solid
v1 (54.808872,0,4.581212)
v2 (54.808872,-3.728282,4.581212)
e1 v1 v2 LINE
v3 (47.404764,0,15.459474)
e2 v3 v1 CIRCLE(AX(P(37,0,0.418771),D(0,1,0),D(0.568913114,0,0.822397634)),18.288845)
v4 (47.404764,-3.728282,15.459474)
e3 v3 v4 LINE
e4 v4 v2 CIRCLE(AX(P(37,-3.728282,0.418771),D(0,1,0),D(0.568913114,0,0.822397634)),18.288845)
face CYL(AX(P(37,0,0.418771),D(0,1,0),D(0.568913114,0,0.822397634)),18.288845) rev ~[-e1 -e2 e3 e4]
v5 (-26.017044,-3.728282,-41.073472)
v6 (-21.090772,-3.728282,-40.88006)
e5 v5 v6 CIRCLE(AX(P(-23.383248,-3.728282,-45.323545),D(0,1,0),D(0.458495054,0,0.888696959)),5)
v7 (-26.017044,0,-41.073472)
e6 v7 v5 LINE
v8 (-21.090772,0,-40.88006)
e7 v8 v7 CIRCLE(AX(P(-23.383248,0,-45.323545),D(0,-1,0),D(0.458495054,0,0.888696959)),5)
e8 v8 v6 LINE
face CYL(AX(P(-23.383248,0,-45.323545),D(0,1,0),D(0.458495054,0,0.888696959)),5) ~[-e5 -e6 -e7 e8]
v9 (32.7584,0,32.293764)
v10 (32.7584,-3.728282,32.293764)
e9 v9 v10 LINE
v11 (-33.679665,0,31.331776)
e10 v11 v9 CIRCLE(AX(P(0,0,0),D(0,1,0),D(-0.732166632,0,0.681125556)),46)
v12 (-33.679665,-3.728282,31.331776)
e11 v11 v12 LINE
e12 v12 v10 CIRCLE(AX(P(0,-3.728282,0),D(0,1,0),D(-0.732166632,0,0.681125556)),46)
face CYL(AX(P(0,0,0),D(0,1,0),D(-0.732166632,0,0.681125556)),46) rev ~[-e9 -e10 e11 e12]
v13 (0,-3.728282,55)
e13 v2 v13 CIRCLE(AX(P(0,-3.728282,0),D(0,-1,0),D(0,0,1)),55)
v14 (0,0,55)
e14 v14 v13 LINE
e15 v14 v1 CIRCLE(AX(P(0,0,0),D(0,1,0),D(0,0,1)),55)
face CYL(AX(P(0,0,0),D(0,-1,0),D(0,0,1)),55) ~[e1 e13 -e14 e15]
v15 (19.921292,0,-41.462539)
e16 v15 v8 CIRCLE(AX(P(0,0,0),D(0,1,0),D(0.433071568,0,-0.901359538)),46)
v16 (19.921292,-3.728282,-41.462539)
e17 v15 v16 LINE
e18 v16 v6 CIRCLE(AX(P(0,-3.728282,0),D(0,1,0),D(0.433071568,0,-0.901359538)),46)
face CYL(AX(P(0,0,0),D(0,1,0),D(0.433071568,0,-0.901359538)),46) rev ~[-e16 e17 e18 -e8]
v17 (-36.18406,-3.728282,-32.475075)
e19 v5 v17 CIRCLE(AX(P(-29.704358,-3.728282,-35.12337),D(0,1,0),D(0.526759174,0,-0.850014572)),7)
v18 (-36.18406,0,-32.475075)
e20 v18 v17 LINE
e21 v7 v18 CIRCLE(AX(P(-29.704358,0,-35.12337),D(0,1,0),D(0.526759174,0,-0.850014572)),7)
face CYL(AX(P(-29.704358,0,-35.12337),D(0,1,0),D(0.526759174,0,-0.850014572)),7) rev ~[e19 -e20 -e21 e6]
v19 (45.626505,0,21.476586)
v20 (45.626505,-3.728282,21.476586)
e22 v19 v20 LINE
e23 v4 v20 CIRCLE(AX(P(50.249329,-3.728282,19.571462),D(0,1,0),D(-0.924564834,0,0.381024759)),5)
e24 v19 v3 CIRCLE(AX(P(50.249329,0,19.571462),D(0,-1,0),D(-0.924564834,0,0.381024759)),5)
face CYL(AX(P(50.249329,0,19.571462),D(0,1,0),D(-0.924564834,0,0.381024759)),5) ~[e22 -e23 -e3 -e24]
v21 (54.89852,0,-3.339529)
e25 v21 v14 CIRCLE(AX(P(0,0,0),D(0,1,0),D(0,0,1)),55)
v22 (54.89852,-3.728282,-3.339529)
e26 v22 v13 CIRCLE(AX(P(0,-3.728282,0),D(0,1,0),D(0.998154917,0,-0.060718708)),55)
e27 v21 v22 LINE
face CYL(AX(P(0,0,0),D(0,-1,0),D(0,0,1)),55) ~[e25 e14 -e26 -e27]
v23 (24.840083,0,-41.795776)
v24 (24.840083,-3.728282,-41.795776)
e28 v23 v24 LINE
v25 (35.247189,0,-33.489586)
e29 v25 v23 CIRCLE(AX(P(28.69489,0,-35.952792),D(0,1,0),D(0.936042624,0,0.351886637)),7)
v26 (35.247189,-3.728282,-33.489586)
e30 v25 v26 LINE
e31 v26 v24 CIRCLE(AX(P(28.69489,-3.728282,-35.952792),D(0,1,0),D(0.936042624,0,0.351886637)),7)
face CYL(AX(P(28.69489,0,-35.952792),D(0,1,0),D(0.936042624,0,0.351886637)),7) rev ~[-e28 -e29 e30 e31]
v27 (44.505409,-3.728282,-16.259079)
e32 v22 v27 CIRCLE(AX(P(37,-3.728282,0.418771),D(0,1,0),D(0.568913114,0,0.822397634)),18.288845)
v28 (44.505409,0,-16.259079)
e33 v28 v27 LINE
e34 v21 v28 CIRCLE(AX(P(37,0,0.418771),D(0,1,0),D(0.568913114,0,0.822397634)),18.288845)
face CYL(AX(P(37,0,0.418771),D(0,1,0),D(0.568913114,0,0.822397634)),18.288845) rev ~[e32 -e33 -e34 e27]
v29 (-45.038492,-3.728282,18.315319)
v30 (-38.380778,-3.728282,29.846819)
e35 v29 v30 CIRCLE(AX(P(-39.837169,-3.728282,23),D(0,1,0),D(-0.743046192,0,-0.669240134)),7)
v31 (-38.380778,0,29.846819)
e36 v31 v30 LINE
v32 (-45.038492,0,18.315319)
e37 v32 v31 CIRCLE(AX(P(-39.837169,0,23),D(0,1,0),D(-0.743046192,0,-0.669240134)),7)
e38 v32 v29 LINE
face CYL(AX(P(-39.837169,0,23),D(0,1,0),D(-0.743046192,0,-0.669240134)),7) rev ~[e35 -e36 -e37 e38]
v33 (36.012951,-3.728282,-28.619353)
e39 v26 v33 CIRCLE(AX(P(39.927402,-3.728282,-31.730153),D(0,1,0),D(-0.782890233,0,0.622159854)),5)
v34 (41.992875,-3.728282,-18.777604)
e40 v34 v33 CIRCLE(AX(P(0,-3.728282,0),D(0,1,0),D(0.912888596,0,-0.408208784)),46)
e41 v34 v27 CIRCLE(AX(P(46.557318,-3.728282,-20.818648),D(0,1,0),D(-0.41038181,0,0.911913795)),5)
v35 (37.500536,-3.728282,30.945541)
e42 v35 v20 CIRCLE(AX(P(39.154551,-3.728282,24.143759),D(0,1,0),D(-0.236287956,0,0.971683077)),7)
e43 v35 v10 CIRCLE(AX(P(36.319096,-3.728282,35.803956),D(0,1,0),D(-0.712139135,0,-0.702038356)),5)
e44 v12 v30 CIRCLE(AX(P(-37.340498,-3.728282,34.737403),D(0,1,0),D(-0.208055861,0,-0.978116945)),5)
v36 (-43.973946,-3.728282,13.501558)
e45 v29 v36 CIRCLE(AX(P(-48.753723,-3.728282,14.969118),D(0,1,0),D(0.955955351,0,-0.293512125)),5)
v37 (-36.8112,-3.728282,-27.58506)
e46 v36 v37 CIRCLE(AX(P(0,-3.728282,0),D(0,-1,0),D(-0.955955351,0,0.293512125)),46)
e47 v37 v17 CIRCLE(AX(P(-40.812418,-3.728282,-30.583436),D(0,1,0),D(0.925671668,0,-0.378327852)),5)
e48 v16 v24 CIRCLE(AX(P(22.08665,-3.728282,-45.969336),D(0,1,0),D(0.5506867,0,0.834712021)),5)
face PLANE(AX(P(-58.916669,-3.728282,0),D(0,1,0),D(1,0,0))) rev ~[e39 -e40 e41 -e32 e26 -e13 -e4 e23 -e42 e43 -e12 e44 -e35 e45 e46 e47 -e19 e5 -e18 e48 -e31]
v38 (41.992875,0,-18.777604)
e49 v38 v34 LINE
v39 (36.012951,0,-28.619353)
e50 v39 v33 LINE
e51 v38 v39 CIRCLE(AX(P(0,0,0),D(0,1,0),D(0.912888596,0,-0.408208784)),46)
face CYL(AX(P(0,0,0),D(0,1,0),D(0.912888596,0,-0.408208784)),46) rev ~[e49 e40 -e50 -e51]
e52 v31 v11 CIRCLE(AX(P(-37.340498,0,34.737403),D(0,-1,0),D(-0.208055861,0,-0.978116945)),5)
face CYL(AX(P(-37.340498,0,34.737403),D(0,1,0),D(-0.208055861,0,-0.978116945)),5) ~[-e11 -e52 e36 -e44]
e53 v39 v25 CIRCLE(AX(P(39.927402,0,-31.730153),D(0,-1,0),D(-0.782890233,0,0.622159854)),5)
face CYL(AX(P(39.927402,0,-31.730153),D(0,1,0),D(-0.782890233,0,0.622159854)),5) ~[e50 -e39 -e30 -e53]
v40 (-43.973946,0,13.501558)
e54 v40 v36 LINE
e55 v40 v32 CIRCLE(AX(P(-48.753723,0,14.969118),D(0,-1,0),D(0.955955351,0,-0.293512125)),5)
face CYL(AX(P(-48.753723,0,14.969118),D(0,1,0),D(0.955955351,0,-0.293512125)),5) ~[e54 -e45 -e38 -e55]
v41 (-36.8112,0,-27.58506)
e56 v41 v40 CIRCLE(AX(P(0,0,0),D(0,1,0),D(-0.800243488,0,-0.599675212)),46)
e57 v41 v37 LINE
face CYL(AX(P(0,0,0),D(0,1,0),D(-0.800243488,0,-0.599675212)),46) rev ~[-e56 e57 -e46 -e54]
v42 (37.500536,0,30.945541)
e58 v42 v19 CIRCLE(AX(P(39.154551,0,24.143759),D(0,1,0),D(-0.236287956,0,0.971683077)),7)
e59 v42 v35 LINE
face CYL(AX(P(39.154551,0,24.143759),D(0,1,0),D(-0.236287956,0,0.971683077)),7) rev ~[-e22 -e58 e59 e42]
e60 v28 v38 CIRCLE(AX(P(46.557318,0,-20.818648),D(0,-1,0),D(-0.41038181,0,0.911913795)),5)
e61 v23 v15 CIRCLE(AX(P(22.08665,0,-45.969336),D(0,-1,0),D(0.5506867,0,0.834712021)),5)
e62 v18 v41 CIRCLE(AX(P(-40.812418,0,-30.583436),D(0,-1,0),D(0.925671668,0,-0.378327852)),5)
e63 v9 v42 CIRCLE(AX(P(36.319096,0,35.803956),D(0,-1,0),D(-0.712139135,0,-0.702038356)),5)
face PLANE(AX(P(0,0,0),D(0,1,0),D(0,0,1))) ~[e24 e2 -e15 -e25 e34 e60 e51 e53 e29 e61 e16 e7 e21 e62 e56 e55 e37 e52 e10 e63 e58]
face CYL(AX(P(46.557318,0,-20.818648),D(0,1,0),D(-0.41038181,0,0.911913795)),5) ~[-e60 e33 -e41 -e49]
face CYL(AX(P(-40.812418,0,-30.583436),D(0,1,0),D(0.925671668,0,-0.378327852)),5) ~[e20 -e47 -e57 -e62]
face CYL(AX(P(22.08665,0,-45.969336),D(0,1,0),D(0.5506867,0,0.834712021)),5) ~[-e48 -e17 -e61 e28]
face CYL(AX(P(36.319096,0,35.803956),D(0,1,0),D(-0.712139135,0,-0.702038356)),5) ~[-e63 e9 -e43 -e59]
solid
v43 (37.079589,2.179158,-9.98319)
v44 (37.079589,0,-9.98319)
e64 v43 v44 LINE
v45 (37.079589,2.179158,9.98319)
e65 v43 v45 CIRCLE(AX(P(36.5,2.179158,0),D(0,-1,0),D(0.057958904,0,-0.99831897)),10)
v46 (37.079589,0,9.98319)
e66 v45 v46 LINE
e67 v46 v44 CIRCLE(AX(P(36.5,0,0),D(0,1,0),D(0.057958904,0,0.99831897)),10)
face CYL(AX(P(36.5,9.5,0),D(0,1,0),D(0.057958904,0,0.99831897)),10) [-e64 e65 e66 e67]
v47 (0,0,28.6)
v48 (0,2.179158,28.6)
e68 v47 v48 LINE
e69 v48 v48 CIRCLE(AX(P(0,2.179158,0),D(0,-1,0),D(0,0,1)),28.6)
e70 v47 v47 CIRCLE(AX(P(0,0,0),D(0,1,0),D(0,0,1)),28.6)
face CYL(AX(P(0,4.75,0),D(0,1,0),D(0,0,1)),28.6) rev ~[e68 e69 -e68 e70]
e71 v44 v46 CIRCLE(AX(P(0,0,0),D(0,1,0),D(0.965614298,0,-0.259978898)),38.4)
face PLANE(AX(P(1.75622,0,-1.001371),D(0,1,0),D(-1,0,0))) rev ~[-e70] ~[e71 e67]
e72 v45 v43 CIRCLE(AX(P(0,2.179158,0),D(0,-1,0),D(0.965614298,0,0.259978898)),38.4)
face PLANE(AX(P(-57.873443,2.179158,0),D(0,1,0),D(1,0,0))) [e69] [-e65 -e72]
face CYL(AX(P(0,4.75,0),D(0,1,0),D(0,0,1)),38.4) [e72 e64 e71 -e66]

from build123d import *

# Parameters (mm, degrees)
F0_W           = 9.5
F0_H           = 9.8
F2_R           = 3.5
F3_DEPTH       = 25
F5_DEPTH       = 10
F7_SIZE        = 2
F8_DEPTH       = 25
F9_R           = 5
F10_DEPTH      = 6
F11_W          = 122.7332167327
F11_H          = 9.202274261
F11_W_2        = 118.1512214243
F11_H_2        = 11.7236196529
F12_DEPTH      = 75.5
F12_DEPTH_BACK = 118.2


# Not quite as in the source:
# - a feature names something its author has since deleted; it is built from what else it names


with BuildPart() as f1:
    # F0 (on Right) → F1 (revolve)
    with BuildSketch(Plane.YZ):
        Polygon((0, 15.2), (0, 28.6), (0, 38.4), (0, 55), (-3, 55), (-8, 55), (-8, 50), (-8, 39), (-8, 24.9987460632), (-8, 15.2), align=None)
        with Locations((4.75, 33.5)):
            Rectangle(F0_W, F0_H)
    revolve(axis=Axis((0, 5.6388881058, 0), (0, 1, 0)))

    # F2 (on face) → F3 (cut)
    with BuildSketch(Plane(origin=(0, 0, 0), x_dir=(-1, 0, 0), z_dir=(0, 1, 0))):
        with Locations((-28.6948903703, -35.9527921953)):
            Circle(F2_R)
        with Locations((39.8371685741, 23)):
            Circle(F2_R)
        with Locations((30.4043578574, -35.1233700587)):
            Circle(F2_R)
        with Locations((-39.5545513391, 23.3937592234)):
            Circle(F2_R)
    extrude(amount=-F3_DEPTH, mode=Mode.SUBTRACT)


with BuildPart() as f5:
    # F4 (on face) → F5 (new body)
    with BuildSketch(Plane(origin=(0, 9.5, 0), x_dir=(-1, 0, 0), z_dir=(0, 1, 0))):
        with BuildLine():
            ThreePointArc((-37.0795890411, -9.9831896979), (-38.4, 0), (-37.0795890411, 9.9831896979))
            ThreePointArc((-37.0795890411, 9.9831896979), (-46.5, 0), (-37.0795890411, -9.9831896979))
        make_face()
    extrude(amount=-F5_DEPTH)


with BuildPart() as f1_1:
    add(f1.part)

    # F6: union F5
    add(f5.part)

    # F7
    f7_edges = [f1_1.edges().sort_by_distance(p)[0] for p in [
        (-38.4, 9.5, 0),
        (46.5, 9.5, 0),
    ]]
    chamfer(f7_edges, length=F7_SIZE)

    # F2 (on face) → F8 (cut)
    with BuildSketch(Plane(origin=(0, 0, 0), x_dir=(-1, 0, 0), z_dir=(0, 1, 0))):
        with BuildLine():
            ThreePointArc((-32.758400191, 32.293764366), (-34.9517475646, 30.9945529981), (-37.5005356453, 30.9455407609))
            ThreePointArc((-37.5005356453, 30.9455407609), (-44.4666515342, 28.7024423136), (-45.6265051805, 21.4765859117))
            ThreePointArc((-45.6265051805, 21.4765859117), (-45.4543437959, 18.1543829003), (-47.4047637825, 15.4594739469))
            ThreePointArc((-47.4047637825, 15.4594739469), (-55.2129137143, -1.2460492891), (-44.5054093348, -16.2590790271))
            ThreePointArc((-44.5054093348, -16.2590790271), (-43.0175767772, -17.2873268137), (-41.9928754074, -18.7776040809))
            ThreePointArc((-41.9928754074, -18.7776040809), (-39.3121130623, -23.886351052), (-36.0129506984, -28.6193532771))
            ThreePointArc((-36.0129506984, -28.6193532771), (-34.9880846428, -30.9535281736), (-35.24718874, -33.4895857334))
            ThreePointArc((-35.24718874, -33.4895857334), (-33.0615041222, -41.4238692685), (-24.8400834669, -41.7957763419))
            ThreePointArc((-24.8400834669, -41.7957763419), (-22.424614561, -40.9807715296), (-19.9212921248, -41.4625387558))
            ThreePointArc((-19.9212921248, -41.4625387558), (0.6532544849, -45.9953612724), (21.0907724926, -40.8800601231))
            ThreePointArc((21.0907724926, -40.8800601231), (23.5794032698, -40.3273940989), (26.017043636, -41.0734720606))
            ThreePointArc((26.017043636, -41.0734720606), (34.224586227, -40.4682307198), (36.1840595318, -32.4750750957))
            ThreePointArc((36.1840595318, -32.4750750957), (35.8530371648, -29.9473988759), (36.8112004323, -27.585059774))
            ThreePointArc((36.8112004323, -27.585059774), (45.3165258085, -7.9001575079), (43.9739461252, 13.5015577685))
            ThreePointArc((43.9739461252, 13.5015577685), (43.8716778697, 16.0487648828), (45.038491918, 18.315319064))
            ThreePointArc((45.038491918, 18.315319064), (45.8993464006, 26.5), (38.3807775469, 29.8468186171))
            ThreePointArc((38.3807775469, 29.8468186171), (35.8344770228, 29.9696051004), (33.6796650808, 31.3317755649))
            ThreePointArc((33.6796650808, 31.3317755649), (0.6659863832, 45.9951786836), (-32.758400191, 32.293764366))
        make_face()
        with Locations((-28.6948903703, -35.9527921953)):
            Circle(F2_R, mode=Mode.SUBTRACT)
        with Locations((30.4043578574, -35.1233700587)):
            Circle(F2_R, mode=Mode.SUBTRACT)
        with Locations((-39.5545513391, 23.3937592234)):
            Circle(F2_R, mode=Mode.SUBTRACT)
        with Locations((39.8371685741, 23)):
            Circle(F2_R, mode=Mode.SUBTRACT)
    extrude(amount=-F8_DEPTH, mode=Mode.SUBTRACT)

    # F9 (on face) → F10 (cut)
    with BuildSketch(Plane.XZ.offset(8)):
        with Locations((-39.8371685741, 23)):
            Circle(F9_R)
        with Locations((28.6948903703, -35.9527921953)):
            Circle(F9_R)
    extrude(amount=-F10_DEPTH, mode=Mode.SUBTRACT)

    # F11 (on Top) → F12 (cut, two sides)
    with BuildSketch(Plane.XY) as f12_sk:
        with Locations((2.4499390274, -8.3294190699)):
            Rectangle(F11_W, F11_H)
        with Locations((1.2021679431, 8.0409679795)):
            Rectangle(F11_W_2, F11_H_2)
    extrude(amount=-F12_DEPTH, mode=Mode.SUBTRACT)
    extrude(f12_sk.sketch, amount=F12_DEPTH_BACK, mode=Mode.SUBTRACT)


solid = f1_1.part
